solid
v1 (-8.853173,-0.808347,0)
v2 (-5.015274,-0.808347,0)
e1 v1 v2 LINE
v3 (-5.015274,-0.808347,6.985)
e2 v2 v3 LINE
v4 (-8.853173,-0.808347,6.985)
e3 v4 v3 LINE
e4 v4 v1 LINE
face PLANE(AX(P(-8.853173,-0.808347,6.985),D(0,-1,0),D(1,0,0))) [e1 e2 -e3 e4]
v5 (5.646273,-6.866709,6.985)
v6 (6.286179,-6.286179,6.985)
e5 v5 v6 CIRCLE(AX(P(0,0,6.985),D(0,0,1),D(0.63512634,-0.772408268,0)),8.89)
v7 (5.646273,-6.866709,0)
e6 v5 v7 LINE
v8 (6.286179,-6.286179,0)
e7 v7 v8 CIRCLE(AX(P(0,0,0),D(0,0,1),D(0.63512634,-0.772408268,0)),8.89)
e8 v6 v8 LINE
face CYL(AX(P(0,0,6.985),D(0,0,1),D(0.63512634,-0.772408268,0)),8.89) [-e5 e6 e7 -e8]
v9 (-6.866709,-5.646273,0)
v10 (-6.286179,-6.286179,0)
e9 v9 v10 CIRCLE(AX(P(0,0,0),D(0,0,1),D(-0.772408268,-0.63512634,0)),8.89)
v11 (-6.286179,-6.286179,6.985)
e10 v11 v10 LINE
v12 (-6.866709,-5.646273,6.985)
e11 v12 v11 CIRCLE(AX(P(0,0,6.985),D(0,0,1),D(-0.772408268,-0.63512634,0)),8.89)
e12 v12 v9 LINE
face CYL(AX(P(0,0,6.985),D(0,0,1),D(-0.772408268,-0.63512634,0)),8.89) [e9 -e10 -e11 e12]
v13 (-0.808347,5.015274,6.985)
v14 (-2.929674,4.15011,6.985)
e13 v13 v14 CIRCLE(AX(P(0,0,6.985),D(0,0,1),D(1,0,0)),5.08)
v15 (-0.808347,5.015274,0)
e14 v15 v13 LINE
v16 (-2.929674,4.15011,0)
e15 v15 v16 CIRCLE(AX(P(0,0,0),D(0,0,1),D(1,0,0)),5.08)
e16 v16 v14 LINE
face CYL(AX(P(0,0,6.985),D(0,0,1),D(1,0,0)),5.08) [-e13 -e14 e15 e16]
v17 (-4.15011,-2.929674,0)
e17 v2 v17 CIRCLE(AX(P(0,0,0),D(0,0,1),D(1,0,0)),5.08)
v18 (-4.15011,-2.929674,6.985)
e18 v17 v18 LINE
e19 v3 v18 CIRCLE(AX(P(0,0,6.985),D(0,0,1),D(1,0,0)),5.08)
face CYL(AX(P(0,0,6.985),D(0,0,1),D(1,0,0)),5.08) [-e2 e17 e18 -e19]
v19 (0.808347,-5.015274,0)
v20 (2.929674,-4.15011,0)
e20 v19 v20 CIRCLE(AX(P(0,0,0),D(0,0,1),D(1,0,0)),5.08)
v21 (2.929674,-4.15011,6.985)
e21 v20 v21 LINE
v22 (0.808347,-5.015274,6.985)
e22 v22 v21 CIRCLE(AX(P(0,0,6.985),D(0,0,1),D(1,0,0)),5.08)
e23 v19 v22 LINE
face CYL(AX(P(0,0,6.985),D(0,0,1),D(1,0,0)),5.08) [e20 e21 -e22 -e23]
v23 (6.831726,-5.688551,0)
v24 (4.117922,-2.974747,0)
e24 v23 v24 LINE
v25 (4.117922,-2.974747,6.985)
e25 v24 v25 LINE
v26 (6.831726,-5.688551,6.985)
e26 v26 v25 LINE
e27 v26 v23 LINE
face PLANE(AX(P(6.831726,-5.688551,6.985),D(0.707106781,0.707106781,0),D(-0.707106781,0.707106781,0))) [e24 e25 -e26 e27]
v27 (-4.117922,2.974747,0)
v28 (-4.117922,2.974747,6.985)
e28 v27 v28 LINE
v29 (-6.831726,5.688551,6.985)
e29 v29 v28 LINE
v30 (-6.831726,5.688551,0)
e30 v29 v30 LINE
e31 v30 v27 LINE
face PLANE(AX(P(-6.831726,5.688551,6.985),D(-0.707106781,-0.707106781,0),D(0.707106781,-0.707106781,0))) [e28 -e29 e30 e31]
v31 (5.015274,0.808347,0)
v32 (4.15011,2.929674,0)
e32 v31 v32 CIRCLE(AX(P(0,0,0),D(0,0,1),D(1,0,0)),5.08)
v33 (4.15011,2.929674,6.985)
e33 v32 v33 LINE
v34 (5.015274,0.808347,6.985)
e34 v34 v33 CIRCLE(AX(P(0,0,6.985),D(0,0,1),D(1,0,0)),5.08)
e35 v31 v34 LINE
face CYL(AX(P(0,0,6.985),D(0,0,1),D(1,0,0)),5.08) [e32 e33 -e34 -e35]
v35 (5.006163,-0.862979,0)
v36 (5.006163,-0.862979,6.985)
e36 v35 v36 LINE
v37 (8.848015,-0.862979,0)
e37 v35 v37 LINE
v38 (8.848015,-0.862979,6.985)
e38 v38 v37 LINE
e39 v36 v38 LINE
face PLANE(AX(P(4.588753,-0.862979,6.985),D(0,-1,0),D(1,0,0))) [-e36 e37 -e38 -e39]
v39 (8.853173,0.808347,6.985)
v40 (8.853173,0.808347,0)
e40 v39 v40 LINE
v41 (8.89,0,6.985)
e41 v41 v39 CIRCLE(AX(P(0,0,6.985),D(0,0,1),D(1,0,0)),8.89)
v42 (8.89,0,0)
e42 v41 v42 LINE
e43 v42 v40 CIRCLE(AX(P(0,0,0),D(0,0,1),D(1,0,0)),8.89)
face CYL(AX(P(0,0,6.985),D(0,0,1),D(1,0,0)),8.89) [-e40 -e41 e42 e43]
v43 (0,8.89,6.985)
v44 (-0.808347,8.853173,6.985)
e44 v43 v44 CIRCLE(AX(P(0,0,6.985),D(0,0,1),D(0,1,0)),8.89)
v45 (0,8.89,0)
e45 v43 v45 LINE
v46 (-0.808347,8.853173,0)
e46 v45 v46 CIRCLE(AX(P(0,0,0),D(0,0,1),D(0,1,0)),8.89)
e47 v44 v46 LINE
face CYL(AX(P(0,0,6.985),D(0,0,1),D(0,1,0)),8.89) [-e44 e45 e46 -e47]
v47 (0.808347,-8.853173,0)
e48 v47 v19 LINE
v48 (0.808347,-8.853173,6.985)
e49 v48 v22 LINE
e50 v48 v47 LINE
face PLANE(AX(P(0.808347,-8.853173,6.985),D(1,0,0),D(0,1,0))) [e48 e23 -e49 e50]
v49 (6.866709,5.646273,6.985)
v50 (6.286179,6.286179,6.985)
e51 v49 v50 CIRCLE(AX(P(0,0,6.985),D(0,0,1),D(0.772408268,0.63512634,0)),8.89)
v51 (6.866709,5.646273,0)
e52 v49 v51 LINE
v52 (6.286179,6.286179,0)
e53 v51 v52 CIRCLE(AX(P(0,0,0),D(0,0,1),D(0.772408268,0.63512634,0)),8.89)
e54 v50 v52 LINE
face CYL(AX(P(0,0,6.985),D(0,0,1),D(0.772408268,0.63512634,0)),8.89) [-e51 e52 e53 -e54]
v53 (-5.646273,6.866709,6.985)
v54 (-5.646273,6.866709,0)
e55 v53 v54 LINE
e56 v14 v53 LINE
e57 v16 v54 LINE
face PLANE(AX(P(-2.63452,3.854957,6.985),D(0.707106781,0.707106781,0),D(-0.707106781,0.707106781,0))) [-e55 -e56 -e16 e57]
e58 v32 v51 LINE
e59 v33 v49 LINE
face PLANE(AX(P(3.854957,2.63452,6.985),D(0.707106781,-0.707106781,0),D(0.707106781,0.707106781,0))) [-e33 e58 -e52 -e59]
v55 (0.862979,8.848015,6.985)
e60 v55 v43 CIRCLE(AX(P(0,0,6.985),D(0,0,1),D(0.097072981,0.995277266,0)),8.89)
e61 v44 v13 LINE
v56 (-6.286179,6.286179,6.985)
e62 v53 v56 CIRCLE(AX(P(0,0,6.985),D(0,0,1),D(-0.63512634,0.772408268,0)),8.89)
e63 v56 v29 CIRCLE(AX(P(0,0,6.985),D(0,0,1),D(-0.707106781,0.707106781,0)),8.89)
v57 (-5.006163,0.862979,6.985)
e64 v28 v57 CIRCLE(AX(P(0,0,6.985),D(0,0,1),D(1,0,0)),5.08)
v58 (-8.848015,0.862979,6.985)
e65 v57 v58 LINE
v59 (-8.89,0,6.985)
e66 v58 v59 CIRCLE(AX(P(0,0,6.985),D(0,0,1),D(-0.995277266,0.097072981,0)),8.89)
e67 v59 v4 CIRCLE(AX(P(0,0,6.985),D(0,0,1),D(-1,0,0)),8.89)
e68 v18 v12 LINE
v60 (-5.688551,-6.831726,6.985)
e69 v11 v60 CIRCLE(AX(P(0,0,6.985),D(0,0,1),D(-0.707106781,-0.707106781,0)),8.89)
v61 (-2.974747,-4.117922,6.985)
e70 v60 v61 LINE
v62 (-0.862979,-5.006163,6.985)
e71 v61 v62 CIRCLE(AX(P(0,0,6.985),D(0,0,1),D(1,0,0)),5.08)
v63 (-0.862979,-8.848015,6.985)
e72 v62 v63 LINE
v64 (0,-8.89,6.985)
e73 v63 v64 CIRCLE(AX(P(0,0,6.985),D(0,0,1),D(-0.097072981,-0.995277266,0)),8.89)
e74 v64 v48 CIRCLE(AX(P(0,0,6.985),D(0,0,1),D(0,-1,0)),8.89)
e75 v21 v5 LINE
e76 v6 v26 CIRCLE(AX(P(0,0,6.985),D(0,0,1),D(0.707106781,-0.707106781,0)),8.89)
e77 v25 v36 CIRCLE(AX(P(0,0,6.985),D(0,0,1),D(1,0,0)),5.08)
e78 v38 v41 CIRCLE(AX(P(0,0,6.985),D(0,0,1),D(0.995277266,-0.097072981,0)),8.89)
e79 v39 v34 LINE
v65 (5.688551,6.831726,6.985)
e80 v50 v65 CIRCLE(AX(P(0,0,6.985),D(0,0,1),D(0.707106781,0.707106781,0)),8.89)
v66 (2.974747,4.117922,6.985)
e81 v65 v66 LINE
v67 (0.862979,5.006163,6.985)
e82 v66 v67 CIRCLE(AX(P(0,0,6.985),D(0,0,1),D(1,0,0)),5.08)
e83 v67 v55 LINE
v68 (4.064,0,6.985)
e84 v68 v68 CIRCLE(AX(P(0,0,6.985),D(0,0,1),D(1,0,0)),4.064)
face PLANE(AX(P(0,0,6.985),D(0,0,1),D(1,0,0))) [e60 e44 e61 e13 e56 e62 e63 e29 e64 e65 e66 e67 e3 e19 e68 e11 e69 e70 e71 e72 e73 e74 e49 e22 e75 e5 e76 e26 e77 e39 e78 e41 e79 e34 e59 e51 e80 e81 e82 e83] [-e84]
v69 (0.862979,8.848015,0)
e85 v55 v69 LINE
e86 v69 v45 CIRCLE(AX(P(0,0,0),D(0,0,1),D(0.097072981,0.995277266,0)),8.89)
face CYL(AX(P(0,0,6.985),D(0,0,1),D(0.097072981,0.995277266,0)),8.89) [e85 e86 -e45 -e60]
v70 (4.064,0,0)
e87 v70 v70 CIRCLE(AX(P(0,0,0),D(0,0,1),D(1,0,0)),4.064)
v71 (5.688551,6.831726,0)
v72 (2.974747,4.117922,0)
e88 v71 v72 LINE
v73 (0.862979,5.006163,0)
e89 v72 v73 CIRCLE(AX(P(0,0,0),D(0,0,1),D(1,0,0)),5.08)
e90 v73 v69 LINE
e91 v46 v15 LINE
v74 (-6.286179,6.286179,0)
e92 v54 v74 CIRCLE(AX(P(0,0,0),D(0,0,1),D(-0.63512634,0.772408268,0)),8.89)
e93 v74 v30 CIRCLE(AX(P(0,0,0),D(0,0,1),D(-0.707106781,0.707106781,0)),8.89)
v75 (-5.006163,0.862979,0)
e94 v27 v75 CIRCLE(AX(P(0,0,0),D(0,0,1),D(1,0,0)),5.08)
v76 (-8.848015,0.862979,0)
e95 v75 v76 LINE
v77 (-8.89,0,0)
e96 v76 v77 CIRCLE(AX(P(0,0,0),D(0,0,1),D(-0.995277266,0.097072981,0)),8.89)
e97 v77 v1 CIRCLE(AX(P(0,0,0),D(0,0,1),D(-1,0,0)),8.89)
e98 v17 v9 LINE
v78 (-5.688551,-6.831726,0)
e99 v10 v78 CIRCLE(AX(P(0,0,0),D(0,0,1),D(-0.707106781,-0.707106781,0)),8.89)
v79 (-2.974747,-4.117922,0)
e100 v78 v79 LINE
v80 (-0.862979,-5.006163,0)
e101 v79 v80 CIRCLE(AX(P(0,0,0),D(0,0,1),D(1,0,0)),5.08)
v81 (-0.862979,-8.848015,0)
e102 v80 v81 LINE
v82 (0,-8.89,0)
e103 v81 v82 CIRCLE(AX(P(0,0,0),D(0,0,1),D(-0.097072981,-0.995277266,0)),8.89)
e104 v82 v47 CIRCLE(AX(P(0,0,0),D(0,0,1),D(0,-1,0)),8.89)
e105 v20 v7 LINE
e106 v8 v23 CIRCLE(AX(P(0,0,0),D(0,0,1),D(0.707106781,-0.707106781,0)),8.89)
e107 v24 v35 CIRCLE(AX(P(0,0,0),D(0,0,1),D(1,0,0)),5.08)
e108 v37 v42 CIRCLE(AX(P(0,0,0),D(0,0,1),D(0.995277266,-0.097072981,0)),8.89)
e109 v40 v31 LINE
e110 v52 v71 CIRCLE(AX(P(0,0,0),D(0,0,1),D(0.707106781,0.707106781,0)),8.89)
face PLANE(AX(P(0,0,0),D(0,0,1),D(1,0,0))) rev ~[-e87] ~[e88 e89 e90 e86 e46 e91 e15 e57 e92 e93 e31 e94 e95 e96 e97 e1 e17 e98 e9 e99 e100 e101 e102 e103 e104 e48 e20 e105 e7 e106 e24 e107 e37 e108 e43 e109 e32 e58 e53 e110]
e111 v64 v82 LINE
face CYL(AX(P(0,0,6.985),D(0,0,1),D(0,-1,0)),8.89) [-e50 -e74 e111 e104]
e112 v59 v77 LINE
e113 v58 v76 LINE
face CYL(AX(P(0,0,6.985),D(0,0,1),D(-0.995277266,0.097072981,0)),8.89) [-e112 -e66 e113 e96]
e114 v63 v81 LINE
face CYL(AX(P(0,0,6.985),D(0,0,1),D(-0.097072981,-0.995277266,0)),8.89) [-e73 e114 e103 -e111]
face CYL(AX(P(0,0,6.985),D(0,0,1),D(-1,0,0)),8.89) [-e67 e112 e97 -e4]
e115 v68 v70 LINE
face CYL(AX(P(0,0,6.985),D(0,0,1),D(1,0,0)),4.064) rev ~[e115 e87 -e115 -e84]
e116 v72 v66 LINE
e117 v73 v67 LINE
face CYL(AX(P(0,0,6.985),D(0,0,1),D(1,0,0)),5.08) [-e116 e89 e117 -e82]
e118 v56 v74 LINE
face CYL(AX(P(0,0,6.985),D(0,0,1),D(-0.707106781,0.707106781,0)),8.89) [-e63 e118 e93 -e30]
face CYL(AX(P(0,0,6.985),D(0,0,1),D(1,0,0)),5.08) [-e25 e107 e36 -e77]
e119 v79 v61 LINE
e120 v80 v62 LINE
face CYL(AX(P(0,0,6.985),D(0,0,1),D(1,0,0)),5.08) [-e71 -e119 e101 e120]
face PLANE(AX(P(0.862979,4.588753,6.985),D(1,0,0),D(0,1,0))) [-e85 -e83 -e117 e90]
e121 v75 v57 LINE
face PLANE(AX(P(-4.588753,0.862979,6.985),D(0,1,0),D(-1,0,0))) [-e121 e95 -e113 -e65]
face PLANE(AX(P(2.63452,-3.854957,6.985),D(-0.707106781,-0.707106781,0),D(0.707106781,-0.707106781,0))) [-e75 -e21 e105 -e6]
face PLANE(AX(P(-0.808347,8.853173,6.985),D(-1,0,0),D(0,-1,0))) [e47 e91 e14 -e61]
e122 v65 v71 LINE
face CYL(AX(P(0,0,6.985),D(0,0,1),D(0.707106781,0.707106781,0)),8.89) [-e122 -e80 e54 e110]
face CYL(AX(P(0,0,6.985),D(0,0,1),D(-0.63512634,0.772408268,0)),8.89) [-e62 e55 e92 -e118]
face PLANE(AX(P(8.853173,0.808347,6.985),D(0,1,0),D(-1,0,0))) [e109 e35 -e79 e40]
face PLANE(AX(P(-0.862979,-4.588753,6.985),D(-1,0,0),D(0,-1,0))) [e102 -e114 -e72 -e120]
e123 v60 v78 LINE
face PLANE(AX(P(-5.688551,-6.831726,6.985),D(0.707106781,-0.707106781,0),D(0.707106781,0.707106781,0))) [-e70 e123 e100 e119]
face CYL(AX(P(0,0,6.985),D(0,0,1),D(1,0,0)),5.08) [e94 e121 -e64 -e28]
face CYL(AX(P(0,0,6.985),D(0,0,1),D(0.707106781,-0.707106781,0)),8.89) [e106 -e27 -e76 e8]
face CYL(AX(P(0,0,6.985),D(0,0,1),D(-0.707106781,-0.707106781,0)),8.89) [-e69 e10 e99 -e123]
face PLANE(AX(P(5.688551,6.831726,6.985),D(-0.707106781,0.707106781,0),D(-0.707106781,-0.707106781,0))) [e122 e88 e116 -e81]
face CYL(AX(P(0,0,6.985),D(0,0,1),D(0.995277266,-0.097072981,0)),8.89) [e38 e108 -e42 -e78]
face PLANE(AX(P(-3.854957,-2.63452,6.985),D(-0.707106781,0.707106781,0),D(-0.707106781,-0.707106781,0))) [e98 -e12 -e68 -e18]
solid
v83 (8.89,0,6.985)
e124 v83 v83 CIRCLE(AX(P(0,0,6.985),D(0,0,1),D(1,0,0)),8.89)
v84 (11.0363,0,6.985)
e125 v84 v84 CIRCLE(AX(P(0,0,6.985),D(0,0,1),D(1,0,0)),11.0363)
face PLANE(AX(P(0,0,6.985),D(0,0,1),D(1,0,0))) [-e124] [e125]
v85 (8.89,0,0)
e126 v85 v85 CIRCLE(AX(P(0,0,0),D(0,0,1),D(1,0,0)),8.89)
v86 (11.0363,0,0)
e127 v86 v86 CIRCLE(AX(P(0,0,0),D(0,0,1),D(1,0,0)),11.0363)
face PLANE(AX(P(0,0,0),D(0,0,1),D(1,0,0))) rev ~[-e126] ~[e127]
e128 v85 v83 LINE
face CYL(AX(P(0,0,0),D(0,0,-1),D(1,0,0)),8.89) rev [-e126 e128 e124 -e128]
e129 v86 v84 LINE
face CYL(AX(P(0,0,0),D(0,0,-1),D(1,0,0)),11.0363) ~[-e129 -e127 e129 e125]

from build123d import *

# Parameters (mm, degrees)
F0_R     = 11.0363
F0_R_2   = 8.89
F1_DEPTH = 6.985
F3_R     = 5.08
F3_R_2   = 4.064
F4_DEPTH = 6.985
F6_DEPTH = 6.985


with BuildPart() as f1:
    # F0 (on Top) → F1 (new body)
    with BuildSketch(Plane.XY):
        Circle(F0_R)
        Circle(F0_R_2, mode=Mode.SUBTRACT)
    extrude(amount=F1_DEPTH)


with BuildPart() as f4:
    # F3 (on face) → F4 (new body)
    with BuildSketch(Plane.XY.offset(6.985)):
        Circle(F3_R)
        Circle(F3_R_2, mode=Mode.SUBTRACT)
    extrude(amount=-F4_DEPTH)

    # F5 (on face) → F6 (join)
    with BuildSketch(Plane.XY.offset(6.985)):
        with BuildLine():
            Line((0, 8.89), (0, 4.588752985))
            Line((0, 4.588752985), (0.8629788063, 4.588752985))
            Line((0.8629788063, 4.588752985), (0.8629788063, 8.8480148949))
            ThreePointArc((0.8629788063, 8.8480148949), (0.4319997596, 8.87949752), (0, 8.89))
        make_face()
        with BuildLine():
            Line((-0.8083467255, 4.6136979945), (0, 4.588752985))
            Line((0, 4.588752985), (0, 8.89))
            ThreePointArc((0, 8.89), (-0.404592586, 8.8807885258), (-0.8083467255, 8.8531731922))
            Line((-0.8083467255, 8.8531731922), (-0.8083467255, 4.6136979945))
        make_face()
        with BuildLine():
            Line((-3.2447383529, 3.2447383529), (-6.2861792847, 6.2861792847))
            ThreePointArc((-6.2861792847, 6.2861792847), (-6.56575595, 5.9935756277), (-6.8317262504, 5.6885513481))
            Line((-6.8317262504, 5.6885513481), (-3.8339645894, 2.6907896871))
            Line((-3.8339645894, 2.6907896871), (-3.2447383529, 3.2447383529))
        make_face()
        with BuildLine():
            Line((-4.588752985, 0.8629788063), (-8.8480148949, 0.8629788063))
            ThreePointArc((-8.8480148949, 0.8629788063), (-8.87949752, 0.4319997596), (-8.89, 0))
            Line((-8.89, 0), (-4.588752985, 0))
            Line((-4.588752985, 0), (-4.588752985, 0.8629788063))
        make_face()
        with BuildLine():
            Line((-4.588752985, 0), (-8.89, 0))
            ThreePointArc((-8.89, 0), (-8.8807885258, -0.404592586), (-8.8531731922, -0.8083467255))
            Line((-8.8531731922, -0.8083467255), (-4.6136979945, -0.8083467255))
            Line((-4.6136979945, -0.8083467255), (-4.588752985, 0))
        make_face()
        with BuildLine():
            Line((-3.8549565188, -2.634520187), (-6.8667094981, -5.6462731663))
            ThreePointArc((-6.8667094981, -5.6462731663), (-6.5842228694, -5.9732829505), (-6.2861792847, -6.2861792847))
            Line((-6.2861792847, -6.2861792847), (-3.2447383529, -3.2447383529))
            Line((-3.2447383529, -3.2447383529), (-3.8549565188, -2.634520187))
        make_face()
        with BuildLine():
            Line((-3.2447383529, -3.2447383529), (-6.2861792847, -6.2861792847))
            ThreePointArc((-6.2861792847, -6.2861792847), (-5.9935756277, -6.56575595), (-5.6885513481, -6.8317262504))
            Line((-5.6885513481, -6.8317262504), (-2.6907896871, -3.8339645894))
            Line((-2.6907896871, -3.8339645894), (-3.2447383529, -3.2447383529))
        make_face()
        with BuildLine():
            Line((-0.8629788063, -4.588752985), (-0.8629788063, -8.8480148949))
            ThreePointArc((-0.8629788063, -8.8480148949), (-0.4319997596, -8.87949752), (0, -8.89))
            Line((0, -8.89), (0, -4.588752985))
            Line((0, -4.588752985), (-0.8629788063, -4.588752985))
        make_face()
        with BuildLine():
            ThreePointArc((0, -8.89), (0.404592586, -8.8807885258), (0.8083467255, -8.8531731922))
            Line((0.8083467255, -8.8531731922), (0.8083467255, -4.6136979945))
            Line((0.8083467255, -4.6136979945), (0, -4.588752985))
            Line((0, -4.588752985), (0, -8.89))
        make_face()
        with BuildLine():
            ThreePointArc((5.6462731663, -6.8667094981), (5.9732829505, -6.5842228694), (6.2861792847, -6.2861792847))
            Line((6.2861792847, -6.2861792847), (3.2447383529, -3.2447383529))
            Line((3.2447383529, -3.2447383529), (2.634520187, -3.8549565188))
            Line((2.634520187, -3.8549565188), (5.6462731663, -6.8667094981))
        make_face()
        with BuildLine():
            ThreePointArc((6.2861792847, -6.2861792847), (6.56575595, -5.9935756277), (6.8317262504, -5.6885513481))
            Line((6.8317262504, -5.6885513481), (3.8339645894, -2.6907896871))
            Line((3.8339645894, -2.6907896871), (3.2447383529, -3.2447383529))
            Line((3.2447383529, -3.2447383529), (6.2861792847, -6.2861792847))
        make_face()
        with BuildLine():
            ThreePointArc((8.8480148949, -0.8629788063), (8.87949752, -0.4319997596), (8.89, 0))
            Line((8.89, 0), (4.588752985, 0))
            Line((4.588752985, 0), (4.588752985, -0.8629788063))
            Line((4.588752985, -0.8629788063), (8.8480148949, -0.8629788063))
        make_face()
        with BuildLine():
            ThreePointArc((8.89, 0), (8.8807885258, 0.404592586), (8.8531731922, 0.8083467255))
            Line((8.8531731922, 0.8083467255), (4.6136979945, 0.8083467255))
            Line((4.6136979945, 0.8083467255), (4.588752985, 0))
            Line((4.588752985, 0), (8.89, 0))
        make_face()
        with BuildLine():
            ThreePointArc((6.8667094981, 5.6462731663), (6.5842228694, 5.9732829505), (6.2861792847, 6.2861792847))
            Line((6.2861792847, 6.2861792847), (3.2447383529, 3.2447383529))
            Line((3.2447383529, 3.2447383529), (3.8549565188, 2.634520187))
            Line((3.8549565188, 2.634520187), (6.8667094981, 5.6462731663))
        make_face()
        with BuildLine():
            ThreePointArc((6.2861792847, 6.2861792847), (5.9935756277, 6.56575595), (5.6885513481, 6.8317262504))
            Line((5.6885513481, 6.8317262504), (2.6907896871, 3.8339645894))
            Line((2.6907896871, 3.8339645894), (3.2447383529, 3.2447383529))
            Line((3.2447383529, 3.2447383529), (6.2861792847, 6.2861792847))
        make_face()
        with BuildLine():
            Line((-2.634520187, 3.8549565188), (-5.6462731663, 6.8667094981))
            ThreePointArc((-5.6462731663, 6.8667094981), (-5.9732829505, 6.5842228694), (-6.2861792847, 6.2861792847))
            Line((-6.2861792847, 6.2861792847), (-3.2447383529, 3.2447383529))
            Line((-3.2447383529, 3.2447383529), (-2.634520187, 3.8549565188))
        make_face()
    extrude(amount=-F6_DEPTH)


solid = Compound([f1.part, f4.part])
